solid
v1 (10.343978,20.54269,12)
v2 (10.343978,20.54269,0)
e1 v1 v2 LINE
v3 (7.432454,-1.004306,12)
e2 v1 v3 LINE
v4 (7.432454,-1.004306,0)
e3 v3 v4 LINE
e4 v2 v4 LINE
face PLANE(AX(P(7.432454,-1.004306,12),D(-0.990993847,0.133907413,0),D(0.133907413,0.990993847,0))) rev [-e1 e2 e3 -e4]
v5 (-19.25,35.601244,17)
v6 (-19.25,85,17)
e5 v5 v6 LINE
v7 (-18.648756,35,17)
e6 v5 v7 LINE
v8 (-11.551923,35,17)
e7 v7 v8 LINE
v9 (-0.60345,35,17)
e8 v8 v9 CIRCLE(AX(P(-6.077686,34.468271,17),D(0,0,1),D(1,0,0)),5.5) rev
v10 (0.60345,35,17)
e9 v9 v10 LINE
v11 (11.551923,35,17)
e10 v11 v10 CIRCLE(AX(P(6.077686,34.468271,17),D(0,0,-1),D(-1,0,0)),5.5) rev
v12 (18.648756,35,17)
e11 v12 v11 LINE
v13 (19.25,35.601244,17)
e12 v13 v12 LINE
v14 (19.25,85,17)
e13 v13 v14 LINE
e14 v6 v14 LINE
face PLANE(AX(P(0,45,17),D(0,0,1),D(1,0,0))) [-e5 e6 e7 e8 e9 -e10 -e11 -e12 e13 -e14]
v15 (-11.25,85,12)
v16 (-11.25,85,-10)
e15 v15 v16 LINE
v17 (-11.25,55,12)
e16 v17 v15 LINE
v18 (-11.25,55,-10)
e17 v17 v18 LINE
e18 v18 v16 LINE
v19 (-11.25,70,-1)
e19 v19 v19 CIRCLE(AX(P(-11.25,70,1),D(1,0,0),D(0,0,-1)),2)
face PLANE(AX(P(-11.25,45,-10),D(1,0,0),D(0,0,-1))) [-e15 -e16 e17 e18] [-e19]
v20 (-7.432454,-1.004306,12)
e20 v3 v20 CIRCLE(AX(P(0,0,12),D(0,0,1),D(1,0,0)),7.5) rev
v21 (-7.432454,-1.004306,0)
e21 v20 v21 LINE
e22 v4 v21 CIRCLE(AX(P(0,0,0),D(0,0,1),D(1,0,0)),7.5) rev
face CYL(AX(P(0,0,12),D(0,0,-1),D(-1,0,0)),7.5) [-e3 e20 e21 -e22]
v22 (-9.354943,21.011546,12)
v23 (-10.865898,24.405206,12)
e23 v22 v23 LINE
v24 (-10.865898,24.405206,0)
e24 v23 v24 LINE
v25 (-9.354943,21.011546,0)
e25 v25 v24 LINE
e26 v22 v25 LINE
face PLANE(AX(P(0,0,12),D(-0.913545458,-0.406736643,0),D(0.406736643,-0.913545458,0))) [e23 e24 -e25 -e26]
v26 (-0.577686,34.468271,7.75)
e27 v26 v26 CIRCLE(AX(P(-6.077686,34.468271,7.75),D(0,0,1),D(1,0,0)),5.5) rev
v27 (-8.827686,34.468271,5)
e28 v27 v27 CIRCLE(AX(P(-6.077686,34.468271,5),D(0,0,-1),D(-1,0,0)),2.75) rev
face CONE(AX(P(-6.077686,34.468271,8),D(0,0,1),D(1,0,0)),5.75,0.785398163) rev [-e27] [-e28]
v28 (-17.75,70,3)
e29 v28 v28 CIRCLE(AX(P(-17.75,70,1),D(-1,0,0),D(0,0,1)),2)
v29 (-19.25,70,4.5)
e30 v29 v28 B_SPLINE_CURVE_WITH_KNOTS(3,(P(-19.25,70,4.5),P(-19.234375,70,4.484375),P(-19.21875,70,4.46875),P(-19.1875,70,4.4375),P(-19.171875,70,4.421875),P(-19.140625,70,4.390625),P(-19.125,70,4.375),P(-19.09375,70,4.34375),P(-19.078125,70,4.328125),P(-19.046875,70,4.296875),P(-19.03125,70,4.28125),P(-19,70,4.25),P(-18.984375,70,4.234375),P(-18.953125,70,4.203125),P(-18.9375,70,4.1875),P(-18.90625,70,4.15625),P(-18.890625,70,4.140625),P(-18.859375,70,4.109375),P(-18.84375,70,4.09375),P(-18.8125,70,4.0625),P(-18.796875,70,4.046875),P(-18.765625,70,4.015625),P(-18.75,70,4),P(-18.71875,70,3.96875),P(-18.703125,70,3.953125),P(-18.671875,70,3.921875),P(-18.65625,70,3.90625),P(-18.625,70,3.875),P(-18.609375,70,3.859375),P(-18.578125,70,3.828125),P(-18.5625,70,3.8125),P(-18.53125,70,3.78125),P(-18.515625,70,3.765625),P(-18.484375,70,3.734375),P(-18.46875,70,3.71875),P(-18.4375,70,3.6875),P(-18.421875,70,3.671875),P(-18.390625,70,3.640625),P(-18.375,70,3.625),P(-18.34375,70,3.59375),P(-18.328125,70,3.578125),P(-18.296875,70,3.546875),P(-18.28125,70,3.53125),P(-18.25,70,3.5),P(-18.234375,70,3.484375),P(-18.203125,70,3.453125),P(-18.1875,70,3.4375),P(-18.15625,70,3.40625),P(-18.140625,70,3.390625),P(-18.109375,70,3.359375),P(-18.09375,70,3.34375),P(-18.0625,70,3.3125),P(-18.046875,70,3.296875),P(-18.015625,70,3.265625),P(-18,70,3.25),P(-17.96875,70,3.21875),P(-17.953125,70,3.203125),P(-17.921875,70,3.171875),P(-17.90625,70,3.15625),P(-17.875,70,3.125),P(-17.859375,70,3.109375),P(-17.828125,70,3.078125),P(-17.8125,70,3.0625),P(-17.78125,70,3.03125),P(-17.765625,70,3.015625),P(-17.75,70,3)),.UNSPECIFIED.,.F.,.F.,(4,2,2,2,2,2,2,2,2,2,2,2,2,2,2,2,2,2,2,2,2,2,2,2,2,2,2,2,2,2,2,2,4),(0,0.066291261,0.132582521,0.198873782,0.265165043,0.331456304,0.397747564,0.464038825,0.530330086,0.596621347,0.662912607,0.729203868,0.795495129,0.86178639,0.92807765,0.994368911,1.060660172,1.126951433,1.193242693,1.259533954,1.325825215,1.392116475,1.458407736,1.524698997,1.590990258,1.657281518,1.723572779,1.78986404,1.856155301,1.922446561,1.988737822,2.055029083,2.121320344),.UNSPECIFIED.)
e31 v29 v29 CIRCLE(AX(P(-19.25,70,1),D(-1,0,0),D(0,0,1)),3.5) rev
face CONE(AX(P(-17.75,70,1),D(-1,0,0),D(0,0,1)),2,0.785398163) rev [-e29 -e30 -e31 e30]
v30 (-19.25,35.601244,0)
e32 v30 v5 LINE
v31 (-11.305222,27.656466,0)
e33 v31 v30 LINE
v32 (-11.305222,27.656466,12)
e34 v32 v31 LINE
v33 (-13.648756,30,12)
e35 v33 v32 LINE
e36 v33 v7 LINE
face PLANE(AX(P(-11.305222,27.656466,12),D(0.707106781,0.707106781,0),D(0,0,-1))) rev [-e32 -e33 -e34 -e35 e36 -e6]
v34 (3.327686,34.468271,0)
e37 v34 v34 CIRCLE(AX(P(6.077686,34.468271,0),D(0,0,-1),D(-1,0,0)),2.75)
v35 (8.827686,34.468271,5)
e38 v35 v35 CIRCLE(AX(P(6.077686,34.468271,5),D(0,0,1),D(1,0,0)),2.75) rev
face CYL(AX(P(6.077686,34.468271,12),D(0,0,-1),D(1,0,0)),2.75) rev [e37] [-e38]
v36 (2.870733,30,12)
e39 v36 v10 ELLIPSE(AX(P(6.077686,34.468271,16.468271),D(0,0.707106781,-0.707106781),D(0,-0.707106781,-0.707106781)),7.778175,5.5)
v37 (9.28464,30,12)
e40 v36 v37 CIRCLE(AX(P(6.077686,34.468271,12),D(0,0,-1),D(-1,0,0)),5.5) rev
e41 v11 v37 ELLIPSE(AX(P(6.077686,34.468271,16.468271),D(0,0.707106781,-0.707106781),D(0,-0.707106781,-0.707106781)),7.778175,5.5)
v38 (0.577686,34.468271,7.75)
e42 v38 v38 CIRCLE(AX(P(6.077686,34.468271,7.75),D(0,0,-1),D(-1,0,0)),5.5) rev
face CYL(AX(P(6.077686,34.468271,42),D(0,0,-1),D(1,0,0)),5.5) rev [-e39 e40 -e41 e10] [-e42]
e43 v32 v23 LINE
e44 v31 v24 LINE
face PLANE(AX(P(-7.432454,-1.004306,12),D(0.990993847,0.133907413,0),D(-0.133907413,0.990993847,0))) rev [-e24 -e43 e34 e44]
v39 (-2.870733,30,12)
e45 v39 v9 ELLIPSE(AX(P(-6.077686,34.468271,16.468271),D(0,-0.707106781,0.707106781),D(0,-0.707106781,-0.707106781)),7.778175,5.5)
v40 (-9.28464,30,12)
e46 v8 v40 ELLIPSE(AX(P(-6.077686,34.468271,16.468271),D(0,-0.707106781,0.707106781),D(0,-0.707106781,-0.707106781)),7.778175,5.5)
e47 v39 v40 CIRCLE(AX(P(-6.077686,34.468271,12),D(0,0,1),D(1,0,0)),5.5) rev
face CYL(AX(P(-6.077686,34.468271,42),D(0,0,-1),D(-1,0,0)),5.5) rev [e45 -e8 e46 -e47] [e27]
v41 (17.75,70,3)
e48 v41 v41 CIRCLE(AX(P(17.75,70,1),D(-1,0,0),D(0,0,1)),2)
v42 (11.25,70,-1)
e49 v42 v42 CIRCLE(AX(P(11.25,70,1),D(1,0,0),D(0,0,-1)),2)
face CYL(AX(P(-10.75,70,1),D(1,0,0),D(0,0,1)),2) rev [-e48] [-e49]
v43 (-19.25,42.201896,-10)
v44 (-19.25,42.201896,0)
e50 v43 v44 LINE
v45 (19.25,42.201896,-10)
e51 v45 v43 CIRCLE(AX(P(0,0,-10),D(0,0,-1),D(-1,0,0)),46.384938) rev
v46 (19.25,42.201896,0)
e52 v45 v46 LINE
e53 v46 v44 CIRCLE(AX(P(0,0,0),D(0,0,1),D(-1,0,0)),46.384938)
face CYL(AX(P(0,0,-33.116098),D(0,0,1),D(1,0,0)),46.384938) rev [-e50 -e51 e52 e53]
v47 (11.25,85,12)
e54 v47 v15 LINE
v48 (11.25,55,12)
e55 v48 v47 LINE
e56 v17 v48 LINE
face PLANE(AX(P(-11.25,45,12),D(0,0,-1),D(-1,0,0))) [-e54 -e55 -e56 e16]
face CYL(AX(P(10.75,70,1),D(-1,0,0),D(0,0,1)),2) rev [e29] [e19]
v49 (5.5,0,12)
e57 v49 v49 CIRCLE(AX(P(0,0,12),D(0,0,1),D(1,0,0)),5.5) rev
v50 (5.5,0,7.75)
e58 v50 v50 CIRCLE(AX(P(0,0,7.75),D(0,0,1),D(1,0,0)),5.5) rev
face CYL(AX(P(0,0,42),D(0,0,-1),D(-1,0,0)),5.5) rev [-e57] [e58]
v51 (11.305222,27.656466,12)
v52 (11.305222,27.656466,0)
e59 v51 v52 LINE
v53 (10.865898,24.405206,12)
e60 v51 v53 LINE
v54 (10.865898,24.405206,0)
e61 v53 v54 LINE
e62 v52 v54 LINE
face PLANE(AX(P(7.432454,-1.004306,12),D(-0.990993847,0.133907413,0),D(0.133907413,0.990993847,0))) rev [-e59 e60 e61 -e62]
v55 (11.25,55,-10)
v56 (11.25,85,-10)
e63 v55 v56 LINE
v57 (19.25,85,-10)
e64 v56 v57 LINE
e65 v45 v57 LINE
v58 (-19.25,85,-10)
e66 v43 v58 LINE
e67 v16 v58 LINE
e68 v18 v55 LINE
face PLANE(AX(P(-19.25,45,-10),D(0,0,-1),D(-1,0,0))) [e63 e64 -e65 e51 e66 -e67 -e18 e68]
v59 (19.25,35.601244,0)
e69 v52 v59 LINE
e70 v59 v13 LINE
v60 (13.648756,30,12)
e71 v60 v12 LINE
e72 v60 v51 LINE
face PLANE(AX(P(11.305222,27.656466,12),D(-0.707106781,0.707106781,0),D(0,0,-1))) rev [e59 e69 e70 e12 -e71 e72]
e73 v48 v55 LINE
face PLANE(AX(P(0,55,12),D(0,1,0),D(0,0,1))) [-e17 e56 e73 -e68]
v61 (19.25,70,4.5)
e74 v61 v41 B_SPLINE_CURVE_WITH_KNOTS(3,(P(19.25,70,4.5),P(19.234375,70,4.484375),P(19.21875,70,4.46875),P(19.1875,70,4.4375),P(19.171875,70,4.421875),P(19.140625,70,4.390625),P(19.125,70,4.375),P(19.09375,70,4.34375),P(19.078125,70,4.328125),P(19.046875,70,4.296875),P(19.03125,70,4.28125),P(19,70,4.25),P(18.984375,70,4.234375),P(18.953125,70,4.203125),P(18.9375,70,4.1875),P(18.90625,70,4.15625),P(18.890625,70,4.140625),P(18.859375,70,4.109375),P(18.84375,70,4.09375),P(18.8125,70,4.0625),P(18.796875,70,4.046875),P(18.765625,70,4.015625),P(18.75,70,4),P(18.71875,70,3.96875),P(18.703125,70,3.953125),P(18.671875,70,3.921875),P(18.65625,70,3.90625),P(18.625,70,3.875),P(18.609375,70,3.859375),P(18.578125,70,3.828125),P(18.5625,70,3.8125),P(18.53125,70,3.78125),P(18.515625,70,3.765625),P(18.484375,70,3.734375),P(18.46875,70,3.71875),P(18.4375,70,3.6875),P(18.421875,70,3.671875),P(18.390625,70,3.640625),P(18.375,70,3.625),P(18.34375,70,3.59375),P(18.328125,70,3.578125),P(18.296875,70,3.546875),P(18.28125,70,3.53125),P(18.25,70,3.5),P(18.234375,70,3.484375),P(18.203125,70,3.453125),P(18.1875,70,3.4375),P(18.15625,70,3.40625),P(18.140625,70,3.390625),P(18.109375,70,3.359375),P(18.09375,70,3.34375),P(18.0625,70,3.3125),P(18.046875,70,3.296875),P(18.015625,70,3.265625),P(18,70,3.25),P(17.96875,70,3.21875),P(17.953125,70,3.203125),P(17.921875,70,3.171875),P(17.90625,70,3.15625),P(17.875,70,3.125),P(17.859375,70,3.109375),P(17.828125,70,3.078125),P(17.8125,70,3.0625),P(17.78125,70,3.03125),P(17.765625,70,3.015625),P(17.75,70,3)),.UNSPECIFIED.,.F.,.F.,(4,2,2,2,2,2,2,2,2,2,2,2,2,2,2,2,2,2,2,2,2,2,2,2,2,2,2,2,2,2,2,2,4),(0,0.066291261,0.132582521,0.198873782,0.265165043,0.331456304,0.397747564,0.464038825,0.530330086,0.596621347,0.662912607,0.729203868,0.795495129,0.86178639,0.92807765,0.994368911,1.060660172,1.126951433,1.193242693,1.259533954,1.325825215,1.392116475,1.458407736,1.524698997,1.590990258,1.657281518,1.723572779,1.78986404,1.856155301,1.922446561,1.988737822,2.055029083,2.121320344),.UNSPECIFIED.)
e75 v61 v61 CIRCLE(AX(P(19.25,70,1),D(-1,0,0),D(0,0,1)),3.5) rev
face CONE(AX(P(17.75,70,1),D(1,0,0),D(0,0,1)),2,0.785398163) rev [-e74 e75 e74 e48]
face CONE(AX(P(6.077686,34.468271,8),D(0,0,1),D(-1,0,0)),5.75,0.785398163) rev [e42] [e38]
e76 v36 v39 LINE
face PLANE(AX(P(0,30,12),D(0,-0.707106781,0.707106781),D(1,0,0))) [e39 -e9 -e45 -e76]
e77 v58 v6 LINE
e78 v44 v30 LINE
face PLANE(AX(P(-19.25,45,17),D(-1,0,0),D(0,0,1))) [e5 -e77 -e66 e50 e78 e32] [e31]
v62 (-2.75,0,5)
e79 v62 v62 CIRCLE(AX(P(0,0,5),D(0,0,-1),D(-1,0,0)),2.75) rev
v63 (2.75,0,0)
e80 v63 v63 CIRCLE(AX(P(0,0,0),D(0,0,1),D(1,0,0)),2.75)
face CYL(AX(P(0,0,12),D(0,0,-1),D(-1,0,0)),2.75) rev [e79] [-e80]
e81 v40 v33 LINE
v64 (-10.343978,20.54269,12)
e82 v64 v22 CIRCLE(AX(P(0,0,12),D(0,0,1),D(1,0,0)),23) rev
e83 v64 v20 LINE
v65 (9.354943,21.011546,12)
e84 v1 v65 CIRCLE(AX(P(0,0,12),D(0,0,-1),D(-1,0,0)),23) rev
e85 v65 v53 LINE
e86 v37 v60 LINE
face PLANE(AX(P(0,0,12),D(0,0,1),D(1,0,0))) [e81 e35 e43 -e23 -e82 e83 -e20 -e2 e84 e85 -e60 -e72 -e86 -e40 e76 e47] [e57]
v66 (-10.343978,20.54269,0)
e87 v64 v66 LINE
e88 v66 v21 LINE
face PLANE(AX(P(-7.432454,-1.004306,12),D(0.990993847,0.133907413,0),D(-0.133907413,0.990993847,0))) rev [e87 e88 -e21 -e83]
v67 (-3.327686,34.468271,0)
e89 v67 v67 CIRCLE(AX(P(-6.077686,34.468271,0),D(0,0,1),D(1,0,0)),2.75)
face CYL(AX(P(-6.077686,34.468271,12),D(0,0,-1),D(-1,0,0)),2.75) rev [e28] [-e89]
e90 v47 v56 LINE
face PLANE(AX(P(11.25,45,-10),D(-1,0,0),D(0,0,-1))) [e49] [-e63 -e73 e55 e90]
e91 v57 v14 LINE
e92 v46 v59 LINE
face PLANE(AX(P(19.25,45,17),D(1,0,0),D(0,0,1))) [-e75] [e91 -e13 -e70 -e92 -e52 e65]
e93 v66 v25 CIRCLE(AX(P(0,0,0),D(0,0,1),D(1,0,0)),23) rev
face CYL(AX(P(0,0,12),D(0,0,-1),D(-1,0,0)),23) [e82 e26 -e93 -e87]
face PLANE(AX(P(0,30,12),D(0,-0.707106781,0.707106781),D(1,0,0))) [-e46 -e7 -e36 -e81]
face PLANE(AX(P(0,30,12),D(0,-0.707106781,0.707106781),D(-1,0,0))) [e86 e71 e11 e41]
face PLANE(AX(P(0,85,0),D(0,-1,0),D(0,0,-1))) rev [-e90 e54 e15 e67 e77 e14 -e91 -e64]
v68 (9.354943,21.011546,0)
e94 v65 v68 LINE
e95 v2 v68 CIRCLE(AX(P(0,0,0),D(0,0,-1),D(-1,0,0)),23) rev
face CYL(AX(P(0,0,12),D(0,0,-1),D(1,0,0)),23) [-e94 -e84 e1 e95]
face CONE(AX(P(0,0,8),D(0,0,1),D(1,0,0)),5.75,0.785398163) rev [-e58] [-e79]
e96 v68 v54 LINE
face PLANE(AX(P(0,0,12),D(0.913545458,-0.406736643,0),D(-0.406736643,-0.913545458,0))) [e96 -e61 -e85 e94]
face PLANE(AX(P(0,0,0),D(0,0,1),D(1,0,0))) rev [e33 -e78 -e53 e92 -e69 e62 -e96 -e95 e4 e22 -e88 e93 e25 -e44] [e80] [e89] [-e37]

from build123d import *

# Parameters (mm, degrees)
SKETCH1_R                = 2.75
BOSS_EXTRUDE1_DEPTH      = 12
BOSS_EXTRUDE2_DEPTH      = 30
BOSS_EXTRUDE2_DEPTH_BACK = 10
CHAMFER1_SIZE            = 17.501152045
CHAMFER1_SIZE_2          = 15
SKETCH4_R                = 2
CUT_EXTRUDE1_DEPTH       = 30
CHAMFER2_SIZE            = 1.5
CUT_EXTRUDE2_DEPTH       = 30
CUT_EXTRUDE2_DEPTH_BACK  = 4
SKETCH5_R                = 5.5
CHAMFER3_SIZE            = 3
BOSS_EXTRUDE3_DEPTH      = 10


with BuildPart() as part:
    # Sketch1 → Boss-Extrude1 (new body)
    with BuildSketch(Plane.XY):
        with BuildLine():
            Line((0, 55), (-15, 55))
            Line((-15, 55), (-10.865898, 24.40520649))
            Line((-10.865898, 24.40520649), (-9.354942791, 21.011545526))
            ThreePointArc((-9.354942791, 21.011545526), (-9.852249787, 20.783002048), (-10.343977944, 20.542690191))
            Line((-10.343977944, 20.542690191), (-7.432453853, -1.004305596))
            ThreePointArc((-7.432453853, -1.004305596), (-4.935468976, -5.647224627), (0, -7.5))
            Line((0, -7.5), (0, -2.75))
            ThreePointArc((0, -2.75), (-2.75, 0), (0, 2.75))
            Line((0, 2.75), (0, 55))
        make_face()
        with Locations((-6.077686218, 34.468271355)):
            Circle(SKETCH1_R, mode=Mode.SUBTRACT)
    extrude(amount=BOSS_EXTRUDE1_DEPTH)

    # Sketch3 → Boss-Extrude2 (add, two sides: drawn at the far end of the back side and taken through both)
    with BuildSketch(Plane(origin=(0, 55, 0), x_dir=(1, 0, 0), z_dir=(0, 1, 0)).offset(-BOSS_EXTRUDE2_DEPTH_BACK)):
        Polygon((0, -17), (-19.25, -17), (-19.25, 10), (-11.25, 10), (-11.25, -12), (0, -12), align=None)
    extrude(amount=BOSS_EXTRUDE2_DEPTH + BOSS_EXTRUDE2_DEPTH_BACK)

    # Chamfer1
    # the kernel refuses this chamfer: 17.501152045, 15 mm, written as the material it adds along each edge
    with BuildSketch(Plane(origin=(-13.648756365, 45, 12), x_dir=(0.1571469904838525, -0.9875752241636421, 0), z_dir=(0, 0, -1))) as chamfer1_piece_1_section:
        Polygon((CHAMFER1_SIZE * 0.999724117502, CHAMFER1_SIZE * 0.0234880574124), (-CHAMFER1_SIZE_2 * 0.157146990484, CHAMFER1_SIZE_2 * 0.987575224164), (0, 0), align=None)
    chamfer1_piece_1 = extrude(amount=12, mode=Mode.PRIVATE)
    chamfer1_piece_1 = split(chamfer1_piece_1, bisect_by=Plane(origin=(-19.25, 37.743808278, 6), z_dir=(1, 0, 0)), keep=Keep.TOP, mode=Mode.PRIVATE)
    add(chamfer1_piece_1)
    # the kernel refuses this chamfer: 17.501152045, 15 mm, written as the material it adds along each edge
    with BuildSketch(Plane(origin=(0, 45, 12), x_dir=(0, 0.02749587661058632, 0.9996219169112968), z_dir=(-1, 0, 0))) as chamfer1_2_piece_1_section:
        Polygon((CHAMFER1_SIZE_2 * 0.999621916911, -CHAMFER1_SIZE_2 * 0.0274958766106), (-CHAMFER1_SIZE_2 * 0.0274958766106, -CHAMFER1_SIZE_2 * 0.999621916911), (0, 0), align=None)
    chamfer1_2_piece_1 = extrude(amount=19.25, mode=Mode.PRIVATE)
    chamfer1_2_piece_1 = chamfer1_2_piece_1 - Plane(origin=(-6.077686218, 34.468271355, 14.181154437), x_dir=(1, 0, 0), z_dir=(0, 0, -1)) * Cylinder(2.75, 99, mode=Mode.PRIVATE)
    chamfer1_2_piece_1 = split(chamfer1_2_piece_1, bisect_by=Plane(origin=(-16.223862411, 32.575106046, 14.181154437), z_dir=(0.7071067811865486, 0.7071067811865466, 0)), keep=Keep.TOP, mode=Mode.PRIVATE)
    chamfer1_2_piece_1 = split(chamfer1_2_piece_1, bisect_by=Plane(origin=(-9.68028065, 39.118687807, 17), z_dir=(0, 0, -1)), keep=Keep.TOP, mode=Mode.PRIVATE)
    add(chamfer1_2_piece_1)

    # Sketch4 → Cut-Extrude1 (cut)
    with BuildSketch(Plane.ZY.offset(19.25)):
        with Locations((1, 70)):
            Circle(SKETCH4_R)
    extrude(amount=-CUT_EXTRUDE1_DEPTH, mode=Mode.SUBTRACT)

    # Chamfer2
    chamfer2_edges = [part.edges().sort_by_distance(p)[0] for p in [
        (-19.25, 70, -1),
    ]]
    chamfer(chamfer2_edges, length=CHAMFER2_SIZE)

    # Sketch5 → Cut-Extrude2 (cut, two sides: drawn at the far end of the back side and taken through both)
    with BuildSketch(Plane.XY.offset(12).offset(-CUT_EXTRUDE2_DEPTH_BACK)):
        Circle(SKETCH5_R)
        with Locations(Location((-6.077686218, 34.468271355, 0), (0, 0, 180))):
            Circle(SKETCH5_R)
    extrude(amount=CUT_EXTRUDE2_DEPTH + CUT_EXTRUDE2_DEPTH_BACK, mode=Mode.SUBTRACT)

    # Chamfer3
    # the kernel refuses this chamfer: 3 mm, written as the material it takes off along each edge
    with BuildSketch(Plane(origin=(0, 0, 8), x_dir=(0.9999950652018582, -0.003141587485879657, 0), z_dir=(0.003141587485879657, 0.9999950652018582, 0))) as chamfer3_piece_1_section:
        Polygon((2.75, CHAMFER3_SIZE), (2.75 + CHAMFER3_SIZE, 0), (2.75, 0), align=None)
    chamfer3_piece_1 = revolve(axis=Axis((0, 0, 8), (0, 0, -1)), revolution_arc=359.64, mode=Mode.PRIVATE)
    chamfer3_piece_1 = chamfer3_piece_1 & Plane(origin=(0, 0, 6.366829543), x_dir=(1, 0, 0), z_dir=(0, 0, 1)) * Cylinder(5.5, 24, mode=Mode.PRIVATE)
    add(chamfer3_piece_1, mode=Mode.SUBTRACT)
    with BuildSketch(Plane(origin=(-6.077686218, 34.468271355, 8), x_dir=(1, 0, 0), z_dir=(0, 1, 0))) as chamfer3_piece_2_section:
        Polygon((2.75, CHAMFER3_SIZE), (2.75 + CHAMFER3_SIZE, 0), (2.75, 0), align=None)
    chamfer3_piece_2 = revolve(axis=Axis((-6.077686218, 34.468271355, 8), (0, 0, -1)), mode=Mode.PRIVATE)
    chamfer3_piece_2 = chamfer3_piece_2 & Plane(origin=(-6.077686218, 34.468271355, 6.366840969), x_dir=(-1, 0, 0), z_dir=(0, 0, 1)) * Cylinder(5.5, 23, mode=Mode.PRIVATE)
    add(chamfer3_piece_2, mode=Mode.SUBTRACT)

    # Sketch6 → Boss-Extrude3 (add)
    with BuildSketch(Plane(origin=(0, 0, 0), x_dir=(-1, 0, 0), z_dir=(0, 0, -1))):
        with BuildLine():
            Line((19.25, 42.201895692), (19.25, 55))
            Line((19.25, 55), (0, 55))
            Line((0, 55), (0, 46.384938288))
            ThreePointArc((0, 46.384938288), (9.849623665, 45.327115656), (19.25, 42.201895692))
        make_face()
    extrude(amount=BOSS_EXTRUDE3_DEPTH)

    # Mirror1: part across plane


with BuildPart() as part_1:
    add(part.part)
    add(part.part.mirror(Plane(origin=(0, 0, 12), x_dir=(0, 0, 1), z_dir=(-1, 0, 0))))


solid = part_1.part
